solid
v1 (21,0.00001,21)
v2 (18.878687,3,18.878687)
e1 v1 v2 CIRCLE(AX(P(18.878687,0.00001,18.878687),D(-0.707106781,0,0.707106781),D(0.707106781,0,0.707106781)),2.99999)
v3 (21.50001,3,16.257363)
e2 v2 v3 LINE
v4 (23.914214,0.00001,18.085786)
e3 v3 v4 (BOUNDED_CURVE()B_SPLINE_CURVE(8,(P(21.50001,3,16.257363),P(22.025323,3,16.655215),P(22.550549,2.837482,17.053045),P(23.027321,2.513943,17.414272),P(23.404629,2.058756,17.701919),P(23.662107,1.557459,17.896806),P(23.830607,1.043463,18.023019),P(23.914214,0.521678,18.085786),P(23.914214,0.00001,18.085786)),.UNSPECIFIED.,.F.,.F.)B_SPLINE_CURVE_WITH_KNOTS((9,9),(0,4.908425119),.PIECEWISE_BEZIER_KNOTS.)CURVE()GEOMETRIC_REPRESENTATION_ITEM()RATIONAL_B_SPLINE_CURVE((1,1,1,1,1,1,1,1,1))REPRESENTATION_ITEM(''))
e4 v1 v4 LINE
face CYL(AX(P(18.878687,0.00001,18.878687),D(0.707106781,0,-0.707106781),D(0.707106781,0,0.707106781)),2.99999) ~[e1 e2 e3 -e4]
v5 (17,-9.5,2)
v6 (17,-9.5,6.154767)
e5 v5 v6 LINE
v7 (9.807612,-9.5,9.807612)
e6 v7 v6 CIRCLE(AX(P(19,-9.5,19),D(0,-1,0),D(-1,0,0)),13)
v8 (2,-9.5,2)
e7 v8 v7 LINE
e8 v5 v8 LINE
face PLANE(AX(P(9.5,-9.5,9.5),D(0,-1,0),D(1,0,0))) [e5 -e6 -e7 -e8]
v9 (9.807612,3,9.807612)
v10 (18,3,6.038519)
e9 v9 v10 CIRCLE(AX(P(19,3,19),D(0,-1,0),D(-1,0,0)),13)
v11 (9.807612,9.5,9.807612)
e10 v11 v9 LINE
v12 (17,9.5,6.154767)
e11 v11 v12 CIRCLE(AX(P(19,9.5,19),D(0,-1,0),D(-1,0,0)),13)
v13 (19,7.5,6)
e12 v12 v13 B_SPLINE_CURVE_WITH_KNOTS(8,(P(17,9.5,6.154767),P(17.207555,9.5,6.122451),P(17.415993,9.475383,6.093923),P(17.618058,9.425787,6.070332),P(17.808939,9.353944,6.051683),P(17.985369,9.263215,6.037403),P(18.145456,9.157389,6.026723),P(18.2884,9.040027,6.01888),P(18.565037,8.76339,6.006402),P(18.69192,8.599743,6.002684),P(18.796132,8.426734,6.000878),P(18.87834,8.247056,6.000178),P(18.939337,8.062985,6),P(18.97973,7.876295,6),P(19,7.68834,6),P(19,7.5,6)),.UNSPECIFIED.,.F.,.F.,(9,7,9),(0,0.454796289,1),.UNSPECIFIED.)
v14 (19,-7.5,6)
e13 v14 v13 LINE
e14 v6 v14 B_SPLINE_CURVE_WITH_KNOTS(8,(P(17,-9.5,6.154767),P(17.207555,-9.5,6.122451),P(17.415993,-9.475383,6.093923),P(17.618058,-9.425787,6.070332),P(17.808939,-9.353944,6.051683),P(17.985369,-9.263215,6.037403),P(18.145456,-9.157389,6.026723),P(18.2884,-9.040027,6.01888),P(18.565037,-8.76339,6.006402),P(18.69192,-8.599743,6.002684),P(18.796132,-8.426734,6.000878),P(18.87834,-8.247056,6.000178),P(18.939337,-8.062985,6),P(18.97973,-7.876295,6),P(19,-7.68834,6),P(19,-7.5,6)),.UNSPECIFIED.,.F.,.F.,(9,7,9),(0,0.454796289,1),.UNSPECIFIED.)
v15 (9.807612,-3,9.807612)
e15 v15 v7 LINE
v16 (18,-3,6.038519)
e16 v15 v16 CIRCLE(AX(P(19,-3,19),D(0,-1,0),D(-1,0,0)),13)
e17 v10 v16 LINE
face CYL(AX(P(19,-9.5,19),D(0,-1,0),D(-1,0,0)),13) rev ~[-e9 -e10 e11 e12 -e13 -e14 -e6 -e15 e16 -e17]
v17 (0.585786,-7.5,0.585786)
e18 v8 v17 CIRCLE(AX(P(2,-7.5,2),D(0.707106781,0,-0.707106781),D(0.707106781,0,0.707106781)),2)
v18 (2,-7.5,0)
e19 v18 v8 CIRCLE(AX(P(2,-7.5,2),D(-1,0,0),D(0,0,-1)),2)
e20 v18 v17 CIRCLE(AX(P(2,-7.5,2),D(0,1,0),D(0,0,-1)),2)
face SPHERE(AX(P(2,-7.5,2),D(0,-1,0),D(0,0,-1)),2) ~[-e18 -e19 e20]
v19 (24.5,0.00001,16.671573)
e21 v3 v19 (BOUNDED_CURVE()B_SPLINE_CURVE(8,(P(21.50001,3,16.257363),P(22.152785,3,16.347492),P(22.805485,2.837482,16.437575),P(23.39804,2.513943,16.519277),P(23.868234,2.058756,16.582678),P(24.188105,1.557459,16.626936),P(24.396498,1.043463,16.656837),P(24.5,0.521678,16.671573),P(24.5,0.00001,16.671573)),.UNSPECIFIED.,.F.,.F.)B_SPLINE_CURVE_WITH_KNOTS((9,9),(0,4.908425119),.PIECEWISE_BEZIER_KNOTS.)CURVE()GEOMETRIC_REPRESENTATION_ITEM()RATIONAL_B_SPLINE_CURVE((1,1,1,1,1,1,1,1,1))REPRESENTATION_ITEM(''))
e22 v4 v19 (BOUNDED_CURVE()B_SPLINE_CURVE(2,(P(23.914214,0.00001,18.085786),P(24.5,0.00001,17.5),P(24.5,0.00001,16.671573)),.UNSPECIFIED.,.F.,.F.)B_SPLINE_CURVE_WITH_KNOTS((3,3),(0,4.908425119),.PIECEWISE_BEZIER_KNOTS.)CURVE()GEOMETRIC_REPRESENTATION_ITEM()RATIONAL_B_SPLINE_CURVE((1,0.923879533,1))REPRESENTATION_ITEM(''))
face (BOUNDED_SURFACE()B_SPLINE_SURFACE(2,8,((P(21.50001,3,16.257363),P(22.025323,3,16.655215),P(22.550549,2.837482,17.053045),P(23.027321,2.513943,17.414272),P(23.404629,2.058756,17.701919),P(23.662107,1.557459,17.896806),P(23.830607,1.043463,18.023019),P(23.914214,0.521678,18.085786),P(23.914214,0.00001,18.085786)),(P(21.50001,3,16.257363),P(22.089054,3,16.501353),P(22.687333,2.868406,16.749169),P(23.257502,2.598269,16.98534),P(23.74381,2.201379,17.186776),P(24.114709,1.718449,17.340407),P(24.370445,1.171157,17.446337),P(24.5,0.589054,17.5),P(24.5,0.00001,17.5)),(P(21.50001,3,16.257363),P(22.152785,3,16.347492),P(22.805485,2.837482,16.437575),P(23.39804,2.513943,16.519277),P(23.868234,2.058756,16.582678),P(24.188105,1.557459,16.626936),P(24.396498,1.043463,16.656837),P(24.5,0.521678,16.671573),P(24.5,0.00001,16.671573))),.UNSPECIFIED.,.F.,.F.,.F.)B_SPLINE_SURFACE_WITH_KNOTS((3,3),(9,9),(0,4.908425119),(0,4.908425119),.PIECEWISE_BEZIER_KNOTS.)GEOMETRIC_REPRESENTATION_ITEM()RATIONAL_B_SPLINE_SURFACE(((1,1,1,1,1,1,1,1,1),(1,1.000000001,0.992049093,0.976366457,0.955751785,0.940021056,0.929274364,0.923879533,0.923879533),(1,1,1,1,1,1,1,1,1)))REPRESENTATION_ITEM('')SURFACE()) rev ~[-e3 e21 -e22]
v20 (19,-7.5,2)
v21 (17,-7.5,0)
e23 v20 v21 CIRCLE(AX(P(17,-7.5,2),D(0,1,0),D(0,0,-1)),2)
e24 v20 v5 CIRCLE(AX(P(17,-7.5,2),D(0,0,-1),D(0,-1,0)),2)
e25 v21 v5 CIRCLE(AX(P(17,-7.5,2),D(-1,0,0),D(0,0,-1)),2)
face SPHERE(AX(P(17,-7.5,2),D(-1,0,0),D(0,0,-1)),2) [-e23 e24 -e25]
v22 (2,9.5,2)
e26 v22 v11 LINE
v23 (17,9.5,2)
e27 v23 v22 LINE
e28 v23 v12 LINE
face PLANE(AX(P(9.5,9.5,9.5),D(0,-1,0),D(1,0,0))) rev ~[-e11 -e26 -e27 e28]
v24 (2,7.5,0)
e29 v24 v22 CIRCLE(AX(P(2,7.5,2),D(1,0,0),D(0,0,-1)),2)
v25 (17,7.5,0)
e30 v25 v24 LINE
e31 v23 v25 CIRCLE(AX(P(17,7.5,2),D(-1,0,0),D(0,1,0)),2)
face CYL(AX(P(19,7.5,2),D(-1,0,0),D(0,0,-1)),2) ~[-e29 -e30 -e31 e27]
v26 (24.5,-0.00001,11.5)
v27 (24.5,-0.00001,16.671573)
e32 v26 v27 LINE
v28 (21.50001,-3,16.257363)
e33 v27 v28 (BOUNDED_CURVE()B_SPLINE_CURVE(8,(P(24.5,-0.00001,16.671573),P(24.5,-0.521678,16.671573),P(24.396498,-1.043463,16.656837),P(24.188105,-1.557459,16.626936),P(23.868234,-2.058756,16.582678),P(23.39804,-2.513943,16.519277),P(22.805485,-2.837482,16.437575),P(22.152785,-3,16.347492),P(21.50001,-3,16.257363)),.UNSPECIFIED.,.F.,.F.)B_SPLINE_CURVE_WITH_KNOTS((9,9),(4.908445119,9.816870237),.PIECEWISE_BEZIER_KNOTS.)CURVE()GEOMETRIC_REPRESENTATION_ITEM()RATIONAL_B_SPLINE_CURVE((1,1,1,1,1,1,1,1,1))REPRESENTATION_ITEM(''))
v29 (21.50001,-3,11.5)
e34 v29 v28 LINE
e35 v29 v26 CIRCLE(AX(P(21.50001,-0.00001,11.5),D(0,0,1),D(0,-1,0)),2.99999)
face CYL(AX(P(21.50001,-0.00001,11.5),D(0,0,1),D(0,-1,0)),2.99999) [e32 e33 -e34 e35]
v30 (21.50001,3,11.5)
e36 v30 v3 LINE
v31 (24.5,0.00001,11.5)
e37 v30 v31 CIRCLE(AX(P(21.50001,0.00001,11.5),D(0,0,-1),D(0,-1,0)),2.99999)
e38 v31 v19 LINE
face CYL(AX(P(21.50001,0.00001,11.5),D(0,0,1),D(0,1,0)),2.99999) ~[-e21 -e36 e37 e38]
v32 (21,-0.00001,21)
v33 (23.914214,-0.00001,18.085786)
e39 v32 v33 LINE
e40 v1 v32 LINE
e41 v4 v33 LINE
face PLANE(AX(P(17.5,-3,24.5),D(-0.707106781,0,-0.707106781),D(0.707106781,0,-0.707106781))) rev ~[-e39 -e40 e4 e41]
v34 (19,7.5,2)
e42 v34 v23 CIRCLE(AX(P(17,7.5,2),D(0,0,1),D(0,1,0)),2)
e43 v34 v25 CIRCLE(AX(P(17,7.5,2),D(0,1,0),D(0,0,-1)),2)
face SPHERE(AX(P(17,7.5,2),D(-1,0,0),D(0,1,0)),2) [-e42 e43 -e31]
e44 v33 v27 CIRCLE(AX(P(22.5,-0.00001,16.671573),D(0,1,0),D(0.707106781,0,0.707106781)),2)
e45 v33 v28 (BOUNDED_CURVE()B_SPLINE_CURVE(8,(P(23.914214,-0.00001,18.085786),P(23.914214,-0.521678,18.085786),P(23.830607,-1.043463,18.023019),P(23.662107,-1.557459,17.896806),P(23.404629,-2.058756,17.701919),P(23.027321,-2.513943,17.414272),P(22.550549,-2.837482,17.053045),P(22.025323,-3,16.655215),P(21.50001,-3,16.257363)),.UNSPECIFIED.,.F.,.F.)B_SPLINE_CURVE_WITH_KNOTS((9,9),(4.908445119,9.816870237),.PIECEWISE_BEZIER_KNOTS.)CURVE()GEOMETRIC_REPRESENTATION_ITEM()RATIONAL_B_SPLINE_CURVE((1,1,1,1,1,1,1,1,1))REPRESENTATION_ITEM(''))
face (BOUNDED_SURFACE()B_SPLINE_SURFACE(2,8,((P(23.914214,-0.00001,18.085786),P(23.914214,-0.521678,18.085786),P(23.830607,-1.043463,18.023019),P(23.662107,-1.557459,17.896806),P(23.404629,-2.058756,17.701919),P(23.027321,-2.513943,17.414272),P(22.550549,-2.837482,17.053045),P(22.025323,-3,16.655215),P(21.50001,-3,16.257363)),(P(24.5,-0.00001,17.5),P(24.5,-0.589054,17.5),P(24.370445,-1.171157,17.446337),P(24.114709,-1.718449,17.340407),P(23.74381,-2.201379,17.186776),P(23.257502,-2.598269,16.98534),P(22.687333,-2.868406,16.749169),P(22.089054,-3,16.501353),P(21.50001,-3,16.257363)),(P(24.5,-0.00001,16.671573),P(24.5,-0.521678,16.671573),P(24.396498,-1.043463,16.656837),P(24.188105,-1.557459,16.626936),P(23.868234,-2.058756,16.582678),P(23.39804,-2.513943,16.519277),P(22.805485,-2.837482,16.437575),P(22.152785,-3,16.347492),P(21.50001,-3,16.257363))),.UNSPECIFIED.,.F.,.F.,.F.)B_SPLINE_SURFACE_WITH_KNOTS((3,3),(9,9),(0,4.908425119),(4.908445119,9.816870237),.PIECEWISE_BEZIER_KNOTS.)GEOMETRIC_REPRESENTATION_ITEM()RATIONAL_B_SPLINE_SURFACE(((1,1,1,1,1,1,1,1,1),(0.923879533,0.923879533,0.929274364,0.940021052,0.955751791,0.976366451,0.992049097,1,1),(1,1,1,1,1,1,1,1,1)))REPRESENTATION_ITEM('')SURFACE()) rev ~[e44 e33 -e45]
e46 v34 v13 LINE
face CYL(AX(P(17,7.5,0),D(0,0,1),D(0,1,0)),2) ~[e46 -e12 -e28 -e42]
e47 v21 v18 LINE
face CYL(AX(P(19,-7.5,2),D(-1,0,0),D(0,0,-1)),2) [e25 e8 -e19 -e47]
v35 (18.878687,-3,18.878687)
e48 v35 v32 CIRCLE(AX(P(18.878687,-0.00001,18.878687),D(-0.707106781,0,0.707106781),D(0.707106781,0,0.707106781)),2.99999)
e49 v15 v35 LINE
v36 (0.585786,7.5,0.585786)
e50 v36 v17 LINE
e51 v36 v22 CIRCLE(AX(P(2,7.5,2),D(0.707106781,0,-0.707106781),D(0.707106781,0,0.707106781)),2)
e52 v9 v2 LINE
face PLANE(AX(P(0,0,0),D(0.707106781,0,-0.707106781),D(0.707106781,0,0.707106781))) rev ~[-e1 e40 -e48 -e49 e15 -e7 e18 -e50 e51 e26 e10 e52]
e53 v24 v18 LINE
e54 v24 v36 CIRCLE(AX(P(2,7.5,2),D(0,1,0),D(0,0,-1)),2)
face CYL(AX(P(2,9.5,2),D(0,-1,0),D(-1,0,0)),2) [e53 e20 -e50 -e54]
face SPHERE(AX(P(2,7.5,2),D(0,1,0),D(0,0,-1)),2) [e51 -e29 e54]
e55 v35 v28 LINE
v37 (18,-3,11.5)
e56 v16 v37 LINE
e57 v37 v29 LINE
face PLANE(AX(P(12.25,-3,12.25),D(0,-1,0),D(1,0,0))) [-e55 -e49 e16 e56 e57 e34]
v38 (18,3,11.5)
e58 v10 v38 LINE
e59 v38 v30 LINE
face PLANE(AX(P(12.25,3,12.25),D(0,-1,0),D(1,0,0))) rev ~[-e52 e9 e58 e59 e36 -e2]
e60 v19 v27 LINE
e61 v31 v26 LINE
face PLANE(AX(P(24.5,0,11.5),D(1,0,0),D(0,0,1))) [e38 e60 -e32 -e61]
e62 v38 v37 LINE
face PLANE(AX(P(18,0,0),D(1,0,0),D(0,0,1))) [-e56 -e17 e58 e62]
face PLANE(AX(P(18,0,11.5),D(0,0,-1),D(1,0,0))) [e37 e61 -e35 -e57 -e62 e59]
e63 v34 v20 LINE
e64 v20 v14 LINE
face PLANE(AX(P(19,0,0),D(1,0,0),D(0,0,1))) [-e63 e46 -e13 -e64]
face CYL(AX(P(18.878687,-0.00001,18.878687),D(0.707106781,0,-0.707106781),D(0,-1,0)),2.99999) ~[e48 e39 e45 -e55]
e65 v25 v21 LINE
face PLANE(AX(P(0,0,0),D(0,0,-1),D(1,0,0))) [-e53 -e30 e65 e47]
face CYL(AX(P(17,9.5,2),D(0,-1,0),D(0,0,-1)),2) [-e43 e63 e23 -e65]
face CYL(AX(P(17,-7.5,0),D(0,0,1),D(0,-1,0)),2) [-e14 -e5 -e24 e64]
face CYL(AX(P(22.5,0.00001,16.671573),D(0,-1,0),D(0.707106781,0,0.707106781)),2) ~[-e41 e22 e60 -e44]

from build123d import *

# Parameters (mm, degrees)
F0_W      = 19
F0_H      = 19
F1_DEPTH  = 9.5
F3_DEPTH  = 19.001
F5_DEPTH  = 3
F6_R      = 2
F8_DEPTH  = 12.501
F9_R      = 2
F11_DEPTH = 9.5
F12_R     = 2.99999
F13_R     = 2


# Not quite as in the source:
# - a fillet or chamfer is up to 0.001 mm smaller than in the source, because OpenCascade refuses the exact size


with BuildPart() as f1:
    # F0 (on Front) → F1 (new body, symmetric)
    with BuildSketch(Plane.XZ):
        with Locations((9.5, 9.5)):
            Rectangle(F0_W, F0_H)
    extrude(amount=F1_DEPTH, both=True)

    # F2 (on face) → F3 (cut, through all)
    with BuildSketch(Plane.XZ.offset(9.5)):
        with BuildLine():
            ThreePointArc((6, 19), (9.8076118446, 9.8076118446), (19, 6))
            Line((19, 6), (19, 19))
            Line((19, 19), (6, 19))
        make_face()
    extrude(amount=-F3_DEPTH, mode=Mode.SUBTRACT)

    # F4 (on Front) → F5 (join, symmetric)
    with BuildSketch(Plane.XZ):
        Polygon((0, 18), (0, 0), (18, 0), (18, 11.5), (24.5, 11.5), (24.5, 24.5), (11.5, 24.5), (11.5, 18), align=None)
    extrude(amount=F5_DEPTH, both=True)

    # F6
    f6_edges = [f1.edges().sort_by_distance(p)[0] for p in [
        (0, 0, 0),
    ]]
    fillet(f6_edges, radius=F6_R)

    # F7 (on face) → F8 (cut, through all)
    with BuildSketch(Plane.XZ.offset(3)):
        Polygon((17.5, 24.5), (24.5, 17.5), (24.5, 24.5), align=None)
    extrude(amount=-F8_DEPTH, mode=Mode.SUBTRACT)

    # F9
    f9_edges = [f1.edges().sort_by_distance(p)[0] for p in [
        (0, -9.5, 10.5),
        (0, 9.5, 10.5),
        (0, 0, 19),
        (3, 9.5, 19),
        (3, -9.5, 19),
        (19, 9.5, 3),
        (19, 0, 0),
        (19, -9.5, 3),
    ]]
    fillet(f9_edges, radius=F9_R)

    # F10 (on Front) → F11 (cut, symmetric)
    with BuildSketch(Plane.XZ):
        Polygon((0, 25), (0, 0), (25, 25), align=None)
    extrude(amount=F11_DEPTH, both=True, mode=Mode.SUBTRACT)

    # F12 (radius 3 in the source; OpenCascade refuses exactly that, so slightly less here)
    f12_edges = [f1.edges().sort_by_distance(p)[0] for p in [
        (22.75, -3, 19.25),
        (24.5, -3, 14.5),
        (24.5, 3, 14.5),
        (22.75, 3, 19.25),
    ]]
    fillet(f12_edges, radius=F12_R)

    # F13
    f13_edges = [f1.edges().sort_by_distance(p)[0] for p in [
        (23.579023, 2.162797, 17.118519),
    ]]
    fillet(f13_edges, radius=F13_R)


solid = f1.part
